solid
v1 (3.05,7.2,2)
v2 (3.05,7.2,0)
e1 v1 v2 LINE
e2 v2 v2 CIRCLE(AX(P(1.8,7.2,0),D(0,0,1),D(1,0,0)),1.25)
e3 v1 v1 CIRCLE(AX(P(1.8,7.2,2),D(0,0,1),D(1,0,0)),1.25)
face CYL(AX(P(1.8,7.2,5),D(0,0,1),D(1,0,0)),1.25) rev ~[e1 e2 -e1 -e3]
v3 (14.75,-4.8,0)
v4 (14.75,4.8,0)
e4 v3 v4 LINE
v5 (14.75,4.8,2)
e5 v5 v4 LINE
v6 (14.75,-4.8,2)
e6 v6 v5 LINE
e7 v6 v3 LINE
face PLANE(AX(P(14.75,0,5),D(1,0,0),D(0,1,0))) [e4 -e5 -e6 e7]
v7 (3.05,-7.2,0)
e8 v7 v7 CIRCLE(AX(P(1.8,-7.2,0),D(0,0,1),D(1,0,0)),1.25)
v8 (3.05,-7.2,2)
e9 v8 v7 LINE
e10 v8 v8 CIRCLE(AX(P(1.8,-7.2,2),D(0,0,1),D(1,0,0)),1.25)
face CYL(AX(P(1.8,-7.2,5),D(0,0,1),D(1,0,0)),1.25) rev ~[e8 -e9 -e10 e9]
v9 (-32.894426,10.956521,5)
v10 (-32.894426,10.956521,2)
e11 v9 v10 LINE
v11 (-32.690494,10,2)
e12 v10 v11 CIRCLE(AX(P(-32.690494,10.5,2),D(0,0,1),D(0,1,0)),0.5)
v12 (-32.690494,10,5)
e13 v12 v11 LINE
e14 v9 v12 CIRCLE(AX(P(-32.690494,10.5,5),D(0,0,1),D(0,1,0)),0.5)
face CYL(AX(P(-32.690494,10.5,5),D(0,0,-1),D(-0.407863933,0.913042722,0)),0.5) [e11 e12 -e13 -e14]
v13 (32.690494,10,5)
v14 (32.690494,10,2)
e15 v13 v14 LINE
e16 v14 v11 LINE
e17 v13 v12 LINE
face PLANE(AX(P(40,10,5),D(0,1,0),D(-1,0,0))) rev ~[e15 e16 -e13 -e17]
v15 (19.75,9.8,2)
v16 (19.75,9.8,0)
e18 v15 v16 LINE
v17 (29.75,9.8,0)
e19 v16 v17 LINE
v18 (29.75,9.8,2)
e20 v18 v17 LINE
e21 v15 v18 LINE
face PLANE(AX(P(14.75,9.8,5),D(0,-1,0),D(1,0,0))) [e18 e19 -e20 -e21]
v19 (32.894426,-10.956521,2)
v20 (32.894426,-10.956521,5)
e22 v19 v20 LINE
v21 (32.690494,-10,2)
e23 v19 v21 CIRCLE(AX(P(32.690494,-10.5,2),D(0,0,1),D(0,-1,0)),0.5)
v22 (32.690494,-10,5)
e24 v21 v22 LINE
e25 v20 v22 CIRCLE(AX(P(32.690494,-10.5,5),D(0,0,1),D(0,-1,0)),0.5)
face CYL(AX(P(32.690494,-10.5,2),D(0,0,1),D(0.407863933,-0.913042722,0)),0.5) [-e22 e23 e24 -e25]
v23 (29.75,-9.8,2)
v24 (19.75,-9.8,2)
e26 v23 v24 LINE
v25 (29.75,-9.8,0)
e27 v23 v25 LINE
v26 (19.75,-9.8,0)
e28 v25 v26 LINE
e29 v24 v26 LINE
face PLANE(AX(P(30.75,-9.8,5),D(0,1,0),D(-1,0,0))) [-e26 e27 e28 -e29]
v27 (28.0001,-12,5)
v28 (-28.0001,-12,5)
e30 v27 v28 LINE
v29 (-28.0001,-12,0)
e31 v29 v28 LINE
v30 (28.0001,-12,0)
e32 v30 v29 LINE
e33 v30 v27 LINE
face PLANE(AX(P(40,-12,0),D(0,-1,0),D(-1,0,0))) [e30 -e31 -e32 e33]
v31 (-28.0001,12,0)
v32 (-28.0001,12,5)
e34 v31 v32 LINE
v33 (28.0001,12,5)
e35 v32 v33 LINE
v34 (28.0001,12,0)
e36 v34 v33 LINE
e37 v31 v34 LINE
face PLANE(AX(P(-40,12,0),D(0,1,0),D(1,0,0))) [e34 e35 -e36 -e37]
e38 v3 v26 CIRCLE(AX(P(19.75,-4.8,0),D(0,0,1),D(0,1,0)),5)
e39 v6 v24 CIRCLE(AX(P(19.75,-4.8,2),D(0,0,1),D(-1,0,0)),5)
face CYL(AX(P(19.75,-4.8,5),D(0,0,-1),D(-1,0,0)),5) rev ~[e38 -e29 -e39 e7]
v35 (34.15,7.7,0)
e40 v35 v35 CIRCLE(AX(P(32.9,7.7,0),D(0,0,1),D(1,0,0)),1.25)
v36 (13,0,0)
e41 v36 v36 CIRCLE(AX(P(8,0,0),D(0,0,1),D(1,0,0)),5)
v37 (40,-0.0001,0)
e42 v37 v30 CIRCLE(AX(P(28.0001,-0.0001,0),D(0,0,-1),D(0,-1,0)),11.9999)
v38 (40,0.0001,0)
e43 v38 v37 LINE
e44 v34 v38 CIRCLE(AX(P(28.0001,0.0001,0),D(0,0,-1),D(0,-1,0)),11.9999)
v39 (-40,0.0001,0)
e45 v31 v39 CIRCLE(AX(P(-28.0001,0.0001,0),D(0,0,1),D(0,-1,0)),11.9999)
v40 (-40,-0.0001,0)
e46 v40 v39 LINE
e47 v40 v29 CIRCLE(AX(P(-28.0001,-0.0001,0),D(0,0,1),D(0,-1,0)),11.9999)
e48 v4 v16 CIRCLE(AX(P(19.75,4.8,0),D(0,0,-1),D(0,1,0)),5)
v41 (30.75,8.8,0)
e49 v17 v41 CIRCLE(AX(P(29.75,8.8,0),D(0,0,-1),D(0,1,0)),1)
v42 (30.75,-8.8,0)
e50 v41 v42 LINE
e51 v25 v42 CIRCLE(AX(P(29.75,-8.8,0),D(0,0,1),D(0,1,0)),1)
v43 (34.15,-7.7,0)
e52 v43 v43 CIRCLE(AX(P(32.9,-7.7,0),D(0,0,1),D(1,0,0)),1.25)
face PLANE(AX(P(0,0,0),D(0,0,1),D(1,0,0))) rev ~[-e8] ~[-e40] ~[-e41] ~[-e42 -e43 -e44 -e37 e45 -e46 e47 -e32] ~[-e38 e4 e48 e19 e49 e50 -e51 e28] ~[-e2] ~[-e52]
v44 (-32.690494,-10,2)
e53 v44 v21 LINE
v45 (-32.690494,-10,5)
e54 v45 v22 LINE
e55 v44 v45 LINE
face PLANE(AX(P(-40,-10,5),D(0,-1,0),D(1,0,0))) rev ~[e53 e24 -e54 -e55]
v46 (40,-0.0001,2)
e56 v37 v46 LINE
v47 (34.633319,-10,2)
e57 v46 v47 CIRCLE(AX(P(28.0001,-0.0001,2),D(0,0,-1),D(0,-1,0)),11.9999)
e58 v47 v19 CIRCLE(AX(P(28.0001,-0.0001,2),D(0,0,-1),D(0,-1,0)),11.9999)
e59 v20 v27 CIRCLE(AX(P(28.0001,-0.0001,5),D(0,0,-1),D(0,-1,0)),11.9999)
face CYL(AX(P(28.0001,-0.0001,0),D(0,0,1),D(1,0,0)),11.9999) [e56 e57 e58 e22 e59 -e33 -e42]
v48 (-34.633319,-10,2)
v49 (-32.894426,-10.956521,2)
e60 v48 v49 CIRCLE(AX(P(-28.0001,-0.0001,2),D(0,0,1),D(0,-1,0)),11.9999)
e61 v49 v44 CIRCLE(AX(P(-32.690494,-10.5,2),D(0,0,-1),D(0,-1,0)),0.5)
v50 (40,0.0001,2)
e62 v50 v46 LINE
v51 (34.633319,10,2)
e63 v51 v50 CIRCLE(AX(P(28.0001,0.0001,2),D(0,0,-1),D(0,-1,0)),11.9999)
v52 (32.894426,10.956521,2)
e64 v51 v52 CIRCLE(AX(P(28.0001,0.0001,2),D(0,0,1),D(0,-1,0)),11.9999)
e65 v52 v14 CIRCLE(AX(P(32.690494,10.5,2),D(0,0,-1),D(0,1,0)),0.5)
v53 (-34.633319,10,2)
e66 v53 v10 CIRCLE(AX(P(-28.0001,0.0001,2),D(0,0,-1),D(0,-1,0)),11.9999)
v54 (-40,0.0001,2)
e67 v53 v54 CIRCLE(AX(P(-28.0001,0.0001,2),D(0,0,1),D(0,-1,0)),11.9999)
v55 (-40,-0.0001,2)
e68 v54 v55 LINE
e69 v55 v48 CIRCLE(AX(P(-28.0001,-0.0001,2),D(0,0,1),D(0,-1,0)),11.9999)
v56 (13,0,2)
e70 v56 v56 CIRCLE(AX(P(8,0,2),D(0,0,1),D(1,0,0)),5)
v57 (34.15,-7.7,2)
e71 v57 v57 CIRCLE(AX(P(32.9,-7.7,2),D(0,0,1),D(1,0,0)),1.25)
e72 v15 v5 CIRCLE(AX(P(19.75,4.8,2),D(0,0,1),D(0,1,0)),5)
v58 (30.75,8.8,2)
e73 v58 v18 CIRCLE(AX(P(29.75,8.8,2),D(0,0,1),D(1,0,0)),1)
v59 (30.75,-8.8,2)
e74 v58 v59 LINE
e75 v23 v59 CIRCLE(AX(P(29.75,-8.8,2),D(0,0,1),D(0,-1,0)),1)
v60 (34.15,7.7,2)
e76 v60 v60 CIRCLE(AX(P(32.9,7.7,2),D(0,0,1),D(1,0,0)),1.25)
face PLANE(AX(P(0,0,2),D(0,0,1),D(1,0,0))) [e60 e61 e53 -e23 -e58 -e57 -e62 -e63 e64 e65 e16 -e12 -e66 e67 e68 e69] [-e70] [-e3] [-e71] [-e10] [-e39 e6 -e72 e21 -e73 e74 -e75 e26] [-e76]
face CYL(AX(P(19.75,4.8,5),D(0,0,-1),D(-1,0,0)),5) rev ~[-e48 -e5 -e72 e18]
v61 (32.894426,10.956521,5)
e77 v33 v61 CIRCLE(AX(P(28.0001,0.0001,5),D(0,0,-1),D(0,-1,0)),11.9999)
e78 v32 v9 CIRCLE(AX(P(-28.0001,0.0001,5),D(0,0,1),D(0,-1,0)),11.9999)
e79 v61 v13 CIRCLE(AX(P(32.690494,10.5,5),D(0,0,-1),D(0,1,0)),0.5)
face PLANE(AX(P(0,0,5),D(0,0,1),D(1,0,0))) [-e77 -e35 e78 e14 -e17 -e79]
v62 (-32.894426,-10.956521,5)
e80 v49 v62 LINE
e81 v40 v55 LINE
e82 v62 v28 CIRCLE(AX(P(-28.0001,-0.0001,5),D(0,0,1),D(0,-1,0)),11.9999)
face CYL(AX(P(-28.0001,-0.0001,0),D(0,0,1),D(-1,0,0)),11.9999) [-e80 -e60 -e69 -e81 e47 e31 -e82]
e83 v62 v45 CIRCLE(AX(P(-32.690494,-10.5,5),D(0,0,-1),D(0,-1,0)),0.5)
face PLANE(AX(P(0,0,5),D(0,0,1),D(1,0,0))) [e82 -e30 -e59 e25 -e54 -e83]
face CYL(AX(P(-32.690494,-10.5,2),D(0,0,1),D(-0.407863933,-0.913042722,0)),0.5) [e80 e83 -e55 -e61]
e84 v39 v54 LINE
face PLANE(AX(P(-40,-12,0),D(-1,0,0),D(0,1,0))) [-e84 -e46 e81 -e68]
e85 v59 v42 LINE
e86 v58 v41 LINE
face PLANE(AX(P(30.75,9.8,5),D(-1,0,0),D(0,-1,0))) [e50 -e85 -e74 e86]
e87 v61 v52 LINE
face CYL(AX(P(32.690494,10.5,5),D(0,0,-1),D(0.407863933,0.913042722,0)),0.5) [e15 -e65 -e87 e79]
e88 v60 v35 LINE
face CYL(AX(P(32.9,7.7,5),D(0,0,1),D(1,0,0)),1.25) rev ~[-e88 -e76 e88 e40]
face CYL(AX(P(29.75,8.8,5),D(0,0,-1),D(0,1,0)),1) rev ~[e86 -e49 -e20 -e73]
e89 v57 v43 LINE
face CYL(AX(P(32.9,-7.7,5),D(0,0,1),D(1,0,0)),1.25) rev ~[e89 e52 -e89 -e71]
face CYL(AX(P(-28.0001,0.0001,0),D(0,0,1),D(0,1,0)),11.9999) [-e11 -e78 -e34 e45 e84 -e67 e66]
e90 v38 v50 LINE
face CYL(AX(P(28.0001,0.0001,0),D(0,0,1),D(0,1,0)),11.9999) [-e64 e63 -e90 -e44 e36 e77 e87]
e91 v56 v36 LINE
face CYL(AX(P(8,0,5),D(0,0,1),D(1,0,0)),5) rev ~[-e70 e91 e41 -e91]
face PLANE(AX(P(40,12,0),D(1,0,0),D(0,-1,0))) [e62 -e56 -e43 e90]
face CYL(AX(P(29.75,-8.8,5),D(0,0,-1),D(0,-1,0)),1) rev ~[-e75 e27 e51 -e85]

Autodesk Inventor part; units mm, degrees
ref_plane "YZ Plane" through (0, 0, 0) normal (1, 0, 0) x (0, 1, 0)
ref_plane "XZ Plane" through (0, 0, 0) normal (0, 1, 0) x (-1, 0, 0)
ref_plane "XY Plane" through (0, 0, 0) normal (0, 0, 1) x (1, 0, 0)
sketch "スケッチ1" plane through (0, 0, 0) normal (0, 0, 1) x (1, 0, 0)
  line L0 (-40, 12) -> (40, 12)
  line L1 (40, 12) -> (40, -12)
  line L2 (40, -12) -> (-40, -12)
  line L3 (-40, -12) -> (-40, 12)
  point P0 (0, 0)
  dimension "d0" = 80
  dimension "d1" = 24
  dimension "d2" = 12
  dimension "d3" = 40
extrude "押し出し1" add sketch "スケッチ1" along normal blind 5
sketch "スケッチ2" plane through (0, 0, 5) normal (0, 0, 1) x (1, 0, 0)
  line L0 (-0.8, 9.8) -> (35, 9.8)
  line L1 (35, 9.8) -> (35, -9.8)
  line L2 (35, -9.8) -> (-0.8, -9.8)
  line L3 (-0.8, -9.8) -> (-0.8, 9.8)
  line L4 (35, 9.8) -> (30.75, 9.8)
  line L5 (30.75, 9.8) -> (30.75, -9.8)
  line L6 (30.75, -9.8) -> (35, -9.8)
  line L7 (35, -9.8) -> (35, 9.8)
  line L8 (30.75, -9.8) -> (14.75, -9.8)
  line L9 (14.75, -9.8) -> (14.75, 9.8)
  line L10 (14.75, 9.8) -> (30.75, 9.8)
  line L11 (30.75, 9.8) -> (30.75, -9.8)
  circle A0 centre (8, 0) radius 5
  line L12 (35, 0) -> (-0.8, 0)
  circle A1 centre (1.8, 7.2) radius 1.25
  circle A2 centre (32.9, 7.7) radius 1.25
  circle A3 centre (1.8, -7.2) radius 1.25
  circle A4 centre (32.9, -7.7) radius 1.25
  line L13 (40, 12) -> (40, -12) projected
  point P0 (0, 0)
  dimension "d6" = 35.8
  dimension "d7" = 19.6
  dimension "d8" = 9.8
  dimension "d10" = 4.25
  dimension "d11" = 16
  dimension "d12" = 10
  dimension "d13" = 27
  dimension "d14" = 14.4
  dimension "d15" = 15.4
  dimension "d16" = 31.1
  dimension "d17" = 2.1
  dimension "d18" = 2.5
  dimension "d19" = 2.5
  dimension "d47" = 5
extrude "押し出し2" cut sketch "スケッチ2" against normal through all contours L0 L5 L12 L9 | L12 L5 L2 L9 | L12 A0 | A0 L12 | A1 | A2 | A3 | A4
fillet "フィレット1" radius 5 2 edges at (14.75, 9.8, 2.5) (14.75, -9.8, 2.5)
fillet "フィレット2" radius 1 2 edges at (30.75, 9.8, 2.5) (30.75, -9.8, 2.5)
sketch "スケッチ5" plane through (0, 0, 5) normal (0, 0, 1) x (1, 0, 0)
  line L0 (40, 12) -> (40, -12) projected
  line L1 (29.75, -9.8) -> (19.75, -9.8) projected
  arc A0 (14.75, -4.8) -> (19.75, -9.8) centre (19.75, -4.8) ccw projected
  line L2 (14.75, -4.8) -> (14.75, 4.8) projected
  arc A1 (19.75, 9.8) -> (14.75, 4.8) centre (19.75, 4.8) ccw projected
  line L3 (19.75, 9.8) -> (29.75, 9.8) projected
  arc A2 (30.75, 8.8) -> (29.75, 9.8) centre (29.75, 8.8) ccw projected
  line L4 (30.75, 8.8) -> (30.75, -8.8) projected
  arc A3 (29.75, -9.8) -> (30.75, -8.8) centre (29.75, -8.8) ccw projected
  circle A4 centre (32.9, -7.7) radius 1.25 projected
  circle A5 centre (1.8, -7.2) radius 1.25 projected
  circle A6 centre (32.9, 7.7) radius 1.25 projected
  circle A7 centre (1.8, 7.2) radius 1.25 projected
  circle A8 centre (8, 0) radius 5 projected
  line L5 (40, 10) -> (-40, 10)
  line L6 (-40, 10) -> (-40, -10)
  line L7 (-40, -10) -> (40, -10)
  line L8 (40, -10) -> (40, 10)
  point P0 (-32.5, 14.4762)
  point P1 (-32.5, -14.4762)
  point P2 (0, 0)
  dimension "d41" = 20
  dimension "d42" = 10
  dimension "d49" = 41.8
extrude "押し出し4" cut sketch "スケッチ5" against normal blind 3
fillet "フィレット3" radius 12 4 edges at (40, -12, 2.5) (40, 12, 2.5) (-40, -12, 2.5) (-40, 12, 2.5)
fillet "フィレット4" radius 0.5 4 edges at (-34.6333, -10, 3.5) (-34.6333, 10, 3.5) (34.6333, 10, 3.5) (34.6333, -10, 3.5)
equation "\"d2\" = 0.5 * d1"
equation "\"d3\" = 0.5 * d0"
equation "\"d8\" = 0.5 * d7"
equation "\"d42\" = 0.5 * d41"
properties part number "JointC2"
